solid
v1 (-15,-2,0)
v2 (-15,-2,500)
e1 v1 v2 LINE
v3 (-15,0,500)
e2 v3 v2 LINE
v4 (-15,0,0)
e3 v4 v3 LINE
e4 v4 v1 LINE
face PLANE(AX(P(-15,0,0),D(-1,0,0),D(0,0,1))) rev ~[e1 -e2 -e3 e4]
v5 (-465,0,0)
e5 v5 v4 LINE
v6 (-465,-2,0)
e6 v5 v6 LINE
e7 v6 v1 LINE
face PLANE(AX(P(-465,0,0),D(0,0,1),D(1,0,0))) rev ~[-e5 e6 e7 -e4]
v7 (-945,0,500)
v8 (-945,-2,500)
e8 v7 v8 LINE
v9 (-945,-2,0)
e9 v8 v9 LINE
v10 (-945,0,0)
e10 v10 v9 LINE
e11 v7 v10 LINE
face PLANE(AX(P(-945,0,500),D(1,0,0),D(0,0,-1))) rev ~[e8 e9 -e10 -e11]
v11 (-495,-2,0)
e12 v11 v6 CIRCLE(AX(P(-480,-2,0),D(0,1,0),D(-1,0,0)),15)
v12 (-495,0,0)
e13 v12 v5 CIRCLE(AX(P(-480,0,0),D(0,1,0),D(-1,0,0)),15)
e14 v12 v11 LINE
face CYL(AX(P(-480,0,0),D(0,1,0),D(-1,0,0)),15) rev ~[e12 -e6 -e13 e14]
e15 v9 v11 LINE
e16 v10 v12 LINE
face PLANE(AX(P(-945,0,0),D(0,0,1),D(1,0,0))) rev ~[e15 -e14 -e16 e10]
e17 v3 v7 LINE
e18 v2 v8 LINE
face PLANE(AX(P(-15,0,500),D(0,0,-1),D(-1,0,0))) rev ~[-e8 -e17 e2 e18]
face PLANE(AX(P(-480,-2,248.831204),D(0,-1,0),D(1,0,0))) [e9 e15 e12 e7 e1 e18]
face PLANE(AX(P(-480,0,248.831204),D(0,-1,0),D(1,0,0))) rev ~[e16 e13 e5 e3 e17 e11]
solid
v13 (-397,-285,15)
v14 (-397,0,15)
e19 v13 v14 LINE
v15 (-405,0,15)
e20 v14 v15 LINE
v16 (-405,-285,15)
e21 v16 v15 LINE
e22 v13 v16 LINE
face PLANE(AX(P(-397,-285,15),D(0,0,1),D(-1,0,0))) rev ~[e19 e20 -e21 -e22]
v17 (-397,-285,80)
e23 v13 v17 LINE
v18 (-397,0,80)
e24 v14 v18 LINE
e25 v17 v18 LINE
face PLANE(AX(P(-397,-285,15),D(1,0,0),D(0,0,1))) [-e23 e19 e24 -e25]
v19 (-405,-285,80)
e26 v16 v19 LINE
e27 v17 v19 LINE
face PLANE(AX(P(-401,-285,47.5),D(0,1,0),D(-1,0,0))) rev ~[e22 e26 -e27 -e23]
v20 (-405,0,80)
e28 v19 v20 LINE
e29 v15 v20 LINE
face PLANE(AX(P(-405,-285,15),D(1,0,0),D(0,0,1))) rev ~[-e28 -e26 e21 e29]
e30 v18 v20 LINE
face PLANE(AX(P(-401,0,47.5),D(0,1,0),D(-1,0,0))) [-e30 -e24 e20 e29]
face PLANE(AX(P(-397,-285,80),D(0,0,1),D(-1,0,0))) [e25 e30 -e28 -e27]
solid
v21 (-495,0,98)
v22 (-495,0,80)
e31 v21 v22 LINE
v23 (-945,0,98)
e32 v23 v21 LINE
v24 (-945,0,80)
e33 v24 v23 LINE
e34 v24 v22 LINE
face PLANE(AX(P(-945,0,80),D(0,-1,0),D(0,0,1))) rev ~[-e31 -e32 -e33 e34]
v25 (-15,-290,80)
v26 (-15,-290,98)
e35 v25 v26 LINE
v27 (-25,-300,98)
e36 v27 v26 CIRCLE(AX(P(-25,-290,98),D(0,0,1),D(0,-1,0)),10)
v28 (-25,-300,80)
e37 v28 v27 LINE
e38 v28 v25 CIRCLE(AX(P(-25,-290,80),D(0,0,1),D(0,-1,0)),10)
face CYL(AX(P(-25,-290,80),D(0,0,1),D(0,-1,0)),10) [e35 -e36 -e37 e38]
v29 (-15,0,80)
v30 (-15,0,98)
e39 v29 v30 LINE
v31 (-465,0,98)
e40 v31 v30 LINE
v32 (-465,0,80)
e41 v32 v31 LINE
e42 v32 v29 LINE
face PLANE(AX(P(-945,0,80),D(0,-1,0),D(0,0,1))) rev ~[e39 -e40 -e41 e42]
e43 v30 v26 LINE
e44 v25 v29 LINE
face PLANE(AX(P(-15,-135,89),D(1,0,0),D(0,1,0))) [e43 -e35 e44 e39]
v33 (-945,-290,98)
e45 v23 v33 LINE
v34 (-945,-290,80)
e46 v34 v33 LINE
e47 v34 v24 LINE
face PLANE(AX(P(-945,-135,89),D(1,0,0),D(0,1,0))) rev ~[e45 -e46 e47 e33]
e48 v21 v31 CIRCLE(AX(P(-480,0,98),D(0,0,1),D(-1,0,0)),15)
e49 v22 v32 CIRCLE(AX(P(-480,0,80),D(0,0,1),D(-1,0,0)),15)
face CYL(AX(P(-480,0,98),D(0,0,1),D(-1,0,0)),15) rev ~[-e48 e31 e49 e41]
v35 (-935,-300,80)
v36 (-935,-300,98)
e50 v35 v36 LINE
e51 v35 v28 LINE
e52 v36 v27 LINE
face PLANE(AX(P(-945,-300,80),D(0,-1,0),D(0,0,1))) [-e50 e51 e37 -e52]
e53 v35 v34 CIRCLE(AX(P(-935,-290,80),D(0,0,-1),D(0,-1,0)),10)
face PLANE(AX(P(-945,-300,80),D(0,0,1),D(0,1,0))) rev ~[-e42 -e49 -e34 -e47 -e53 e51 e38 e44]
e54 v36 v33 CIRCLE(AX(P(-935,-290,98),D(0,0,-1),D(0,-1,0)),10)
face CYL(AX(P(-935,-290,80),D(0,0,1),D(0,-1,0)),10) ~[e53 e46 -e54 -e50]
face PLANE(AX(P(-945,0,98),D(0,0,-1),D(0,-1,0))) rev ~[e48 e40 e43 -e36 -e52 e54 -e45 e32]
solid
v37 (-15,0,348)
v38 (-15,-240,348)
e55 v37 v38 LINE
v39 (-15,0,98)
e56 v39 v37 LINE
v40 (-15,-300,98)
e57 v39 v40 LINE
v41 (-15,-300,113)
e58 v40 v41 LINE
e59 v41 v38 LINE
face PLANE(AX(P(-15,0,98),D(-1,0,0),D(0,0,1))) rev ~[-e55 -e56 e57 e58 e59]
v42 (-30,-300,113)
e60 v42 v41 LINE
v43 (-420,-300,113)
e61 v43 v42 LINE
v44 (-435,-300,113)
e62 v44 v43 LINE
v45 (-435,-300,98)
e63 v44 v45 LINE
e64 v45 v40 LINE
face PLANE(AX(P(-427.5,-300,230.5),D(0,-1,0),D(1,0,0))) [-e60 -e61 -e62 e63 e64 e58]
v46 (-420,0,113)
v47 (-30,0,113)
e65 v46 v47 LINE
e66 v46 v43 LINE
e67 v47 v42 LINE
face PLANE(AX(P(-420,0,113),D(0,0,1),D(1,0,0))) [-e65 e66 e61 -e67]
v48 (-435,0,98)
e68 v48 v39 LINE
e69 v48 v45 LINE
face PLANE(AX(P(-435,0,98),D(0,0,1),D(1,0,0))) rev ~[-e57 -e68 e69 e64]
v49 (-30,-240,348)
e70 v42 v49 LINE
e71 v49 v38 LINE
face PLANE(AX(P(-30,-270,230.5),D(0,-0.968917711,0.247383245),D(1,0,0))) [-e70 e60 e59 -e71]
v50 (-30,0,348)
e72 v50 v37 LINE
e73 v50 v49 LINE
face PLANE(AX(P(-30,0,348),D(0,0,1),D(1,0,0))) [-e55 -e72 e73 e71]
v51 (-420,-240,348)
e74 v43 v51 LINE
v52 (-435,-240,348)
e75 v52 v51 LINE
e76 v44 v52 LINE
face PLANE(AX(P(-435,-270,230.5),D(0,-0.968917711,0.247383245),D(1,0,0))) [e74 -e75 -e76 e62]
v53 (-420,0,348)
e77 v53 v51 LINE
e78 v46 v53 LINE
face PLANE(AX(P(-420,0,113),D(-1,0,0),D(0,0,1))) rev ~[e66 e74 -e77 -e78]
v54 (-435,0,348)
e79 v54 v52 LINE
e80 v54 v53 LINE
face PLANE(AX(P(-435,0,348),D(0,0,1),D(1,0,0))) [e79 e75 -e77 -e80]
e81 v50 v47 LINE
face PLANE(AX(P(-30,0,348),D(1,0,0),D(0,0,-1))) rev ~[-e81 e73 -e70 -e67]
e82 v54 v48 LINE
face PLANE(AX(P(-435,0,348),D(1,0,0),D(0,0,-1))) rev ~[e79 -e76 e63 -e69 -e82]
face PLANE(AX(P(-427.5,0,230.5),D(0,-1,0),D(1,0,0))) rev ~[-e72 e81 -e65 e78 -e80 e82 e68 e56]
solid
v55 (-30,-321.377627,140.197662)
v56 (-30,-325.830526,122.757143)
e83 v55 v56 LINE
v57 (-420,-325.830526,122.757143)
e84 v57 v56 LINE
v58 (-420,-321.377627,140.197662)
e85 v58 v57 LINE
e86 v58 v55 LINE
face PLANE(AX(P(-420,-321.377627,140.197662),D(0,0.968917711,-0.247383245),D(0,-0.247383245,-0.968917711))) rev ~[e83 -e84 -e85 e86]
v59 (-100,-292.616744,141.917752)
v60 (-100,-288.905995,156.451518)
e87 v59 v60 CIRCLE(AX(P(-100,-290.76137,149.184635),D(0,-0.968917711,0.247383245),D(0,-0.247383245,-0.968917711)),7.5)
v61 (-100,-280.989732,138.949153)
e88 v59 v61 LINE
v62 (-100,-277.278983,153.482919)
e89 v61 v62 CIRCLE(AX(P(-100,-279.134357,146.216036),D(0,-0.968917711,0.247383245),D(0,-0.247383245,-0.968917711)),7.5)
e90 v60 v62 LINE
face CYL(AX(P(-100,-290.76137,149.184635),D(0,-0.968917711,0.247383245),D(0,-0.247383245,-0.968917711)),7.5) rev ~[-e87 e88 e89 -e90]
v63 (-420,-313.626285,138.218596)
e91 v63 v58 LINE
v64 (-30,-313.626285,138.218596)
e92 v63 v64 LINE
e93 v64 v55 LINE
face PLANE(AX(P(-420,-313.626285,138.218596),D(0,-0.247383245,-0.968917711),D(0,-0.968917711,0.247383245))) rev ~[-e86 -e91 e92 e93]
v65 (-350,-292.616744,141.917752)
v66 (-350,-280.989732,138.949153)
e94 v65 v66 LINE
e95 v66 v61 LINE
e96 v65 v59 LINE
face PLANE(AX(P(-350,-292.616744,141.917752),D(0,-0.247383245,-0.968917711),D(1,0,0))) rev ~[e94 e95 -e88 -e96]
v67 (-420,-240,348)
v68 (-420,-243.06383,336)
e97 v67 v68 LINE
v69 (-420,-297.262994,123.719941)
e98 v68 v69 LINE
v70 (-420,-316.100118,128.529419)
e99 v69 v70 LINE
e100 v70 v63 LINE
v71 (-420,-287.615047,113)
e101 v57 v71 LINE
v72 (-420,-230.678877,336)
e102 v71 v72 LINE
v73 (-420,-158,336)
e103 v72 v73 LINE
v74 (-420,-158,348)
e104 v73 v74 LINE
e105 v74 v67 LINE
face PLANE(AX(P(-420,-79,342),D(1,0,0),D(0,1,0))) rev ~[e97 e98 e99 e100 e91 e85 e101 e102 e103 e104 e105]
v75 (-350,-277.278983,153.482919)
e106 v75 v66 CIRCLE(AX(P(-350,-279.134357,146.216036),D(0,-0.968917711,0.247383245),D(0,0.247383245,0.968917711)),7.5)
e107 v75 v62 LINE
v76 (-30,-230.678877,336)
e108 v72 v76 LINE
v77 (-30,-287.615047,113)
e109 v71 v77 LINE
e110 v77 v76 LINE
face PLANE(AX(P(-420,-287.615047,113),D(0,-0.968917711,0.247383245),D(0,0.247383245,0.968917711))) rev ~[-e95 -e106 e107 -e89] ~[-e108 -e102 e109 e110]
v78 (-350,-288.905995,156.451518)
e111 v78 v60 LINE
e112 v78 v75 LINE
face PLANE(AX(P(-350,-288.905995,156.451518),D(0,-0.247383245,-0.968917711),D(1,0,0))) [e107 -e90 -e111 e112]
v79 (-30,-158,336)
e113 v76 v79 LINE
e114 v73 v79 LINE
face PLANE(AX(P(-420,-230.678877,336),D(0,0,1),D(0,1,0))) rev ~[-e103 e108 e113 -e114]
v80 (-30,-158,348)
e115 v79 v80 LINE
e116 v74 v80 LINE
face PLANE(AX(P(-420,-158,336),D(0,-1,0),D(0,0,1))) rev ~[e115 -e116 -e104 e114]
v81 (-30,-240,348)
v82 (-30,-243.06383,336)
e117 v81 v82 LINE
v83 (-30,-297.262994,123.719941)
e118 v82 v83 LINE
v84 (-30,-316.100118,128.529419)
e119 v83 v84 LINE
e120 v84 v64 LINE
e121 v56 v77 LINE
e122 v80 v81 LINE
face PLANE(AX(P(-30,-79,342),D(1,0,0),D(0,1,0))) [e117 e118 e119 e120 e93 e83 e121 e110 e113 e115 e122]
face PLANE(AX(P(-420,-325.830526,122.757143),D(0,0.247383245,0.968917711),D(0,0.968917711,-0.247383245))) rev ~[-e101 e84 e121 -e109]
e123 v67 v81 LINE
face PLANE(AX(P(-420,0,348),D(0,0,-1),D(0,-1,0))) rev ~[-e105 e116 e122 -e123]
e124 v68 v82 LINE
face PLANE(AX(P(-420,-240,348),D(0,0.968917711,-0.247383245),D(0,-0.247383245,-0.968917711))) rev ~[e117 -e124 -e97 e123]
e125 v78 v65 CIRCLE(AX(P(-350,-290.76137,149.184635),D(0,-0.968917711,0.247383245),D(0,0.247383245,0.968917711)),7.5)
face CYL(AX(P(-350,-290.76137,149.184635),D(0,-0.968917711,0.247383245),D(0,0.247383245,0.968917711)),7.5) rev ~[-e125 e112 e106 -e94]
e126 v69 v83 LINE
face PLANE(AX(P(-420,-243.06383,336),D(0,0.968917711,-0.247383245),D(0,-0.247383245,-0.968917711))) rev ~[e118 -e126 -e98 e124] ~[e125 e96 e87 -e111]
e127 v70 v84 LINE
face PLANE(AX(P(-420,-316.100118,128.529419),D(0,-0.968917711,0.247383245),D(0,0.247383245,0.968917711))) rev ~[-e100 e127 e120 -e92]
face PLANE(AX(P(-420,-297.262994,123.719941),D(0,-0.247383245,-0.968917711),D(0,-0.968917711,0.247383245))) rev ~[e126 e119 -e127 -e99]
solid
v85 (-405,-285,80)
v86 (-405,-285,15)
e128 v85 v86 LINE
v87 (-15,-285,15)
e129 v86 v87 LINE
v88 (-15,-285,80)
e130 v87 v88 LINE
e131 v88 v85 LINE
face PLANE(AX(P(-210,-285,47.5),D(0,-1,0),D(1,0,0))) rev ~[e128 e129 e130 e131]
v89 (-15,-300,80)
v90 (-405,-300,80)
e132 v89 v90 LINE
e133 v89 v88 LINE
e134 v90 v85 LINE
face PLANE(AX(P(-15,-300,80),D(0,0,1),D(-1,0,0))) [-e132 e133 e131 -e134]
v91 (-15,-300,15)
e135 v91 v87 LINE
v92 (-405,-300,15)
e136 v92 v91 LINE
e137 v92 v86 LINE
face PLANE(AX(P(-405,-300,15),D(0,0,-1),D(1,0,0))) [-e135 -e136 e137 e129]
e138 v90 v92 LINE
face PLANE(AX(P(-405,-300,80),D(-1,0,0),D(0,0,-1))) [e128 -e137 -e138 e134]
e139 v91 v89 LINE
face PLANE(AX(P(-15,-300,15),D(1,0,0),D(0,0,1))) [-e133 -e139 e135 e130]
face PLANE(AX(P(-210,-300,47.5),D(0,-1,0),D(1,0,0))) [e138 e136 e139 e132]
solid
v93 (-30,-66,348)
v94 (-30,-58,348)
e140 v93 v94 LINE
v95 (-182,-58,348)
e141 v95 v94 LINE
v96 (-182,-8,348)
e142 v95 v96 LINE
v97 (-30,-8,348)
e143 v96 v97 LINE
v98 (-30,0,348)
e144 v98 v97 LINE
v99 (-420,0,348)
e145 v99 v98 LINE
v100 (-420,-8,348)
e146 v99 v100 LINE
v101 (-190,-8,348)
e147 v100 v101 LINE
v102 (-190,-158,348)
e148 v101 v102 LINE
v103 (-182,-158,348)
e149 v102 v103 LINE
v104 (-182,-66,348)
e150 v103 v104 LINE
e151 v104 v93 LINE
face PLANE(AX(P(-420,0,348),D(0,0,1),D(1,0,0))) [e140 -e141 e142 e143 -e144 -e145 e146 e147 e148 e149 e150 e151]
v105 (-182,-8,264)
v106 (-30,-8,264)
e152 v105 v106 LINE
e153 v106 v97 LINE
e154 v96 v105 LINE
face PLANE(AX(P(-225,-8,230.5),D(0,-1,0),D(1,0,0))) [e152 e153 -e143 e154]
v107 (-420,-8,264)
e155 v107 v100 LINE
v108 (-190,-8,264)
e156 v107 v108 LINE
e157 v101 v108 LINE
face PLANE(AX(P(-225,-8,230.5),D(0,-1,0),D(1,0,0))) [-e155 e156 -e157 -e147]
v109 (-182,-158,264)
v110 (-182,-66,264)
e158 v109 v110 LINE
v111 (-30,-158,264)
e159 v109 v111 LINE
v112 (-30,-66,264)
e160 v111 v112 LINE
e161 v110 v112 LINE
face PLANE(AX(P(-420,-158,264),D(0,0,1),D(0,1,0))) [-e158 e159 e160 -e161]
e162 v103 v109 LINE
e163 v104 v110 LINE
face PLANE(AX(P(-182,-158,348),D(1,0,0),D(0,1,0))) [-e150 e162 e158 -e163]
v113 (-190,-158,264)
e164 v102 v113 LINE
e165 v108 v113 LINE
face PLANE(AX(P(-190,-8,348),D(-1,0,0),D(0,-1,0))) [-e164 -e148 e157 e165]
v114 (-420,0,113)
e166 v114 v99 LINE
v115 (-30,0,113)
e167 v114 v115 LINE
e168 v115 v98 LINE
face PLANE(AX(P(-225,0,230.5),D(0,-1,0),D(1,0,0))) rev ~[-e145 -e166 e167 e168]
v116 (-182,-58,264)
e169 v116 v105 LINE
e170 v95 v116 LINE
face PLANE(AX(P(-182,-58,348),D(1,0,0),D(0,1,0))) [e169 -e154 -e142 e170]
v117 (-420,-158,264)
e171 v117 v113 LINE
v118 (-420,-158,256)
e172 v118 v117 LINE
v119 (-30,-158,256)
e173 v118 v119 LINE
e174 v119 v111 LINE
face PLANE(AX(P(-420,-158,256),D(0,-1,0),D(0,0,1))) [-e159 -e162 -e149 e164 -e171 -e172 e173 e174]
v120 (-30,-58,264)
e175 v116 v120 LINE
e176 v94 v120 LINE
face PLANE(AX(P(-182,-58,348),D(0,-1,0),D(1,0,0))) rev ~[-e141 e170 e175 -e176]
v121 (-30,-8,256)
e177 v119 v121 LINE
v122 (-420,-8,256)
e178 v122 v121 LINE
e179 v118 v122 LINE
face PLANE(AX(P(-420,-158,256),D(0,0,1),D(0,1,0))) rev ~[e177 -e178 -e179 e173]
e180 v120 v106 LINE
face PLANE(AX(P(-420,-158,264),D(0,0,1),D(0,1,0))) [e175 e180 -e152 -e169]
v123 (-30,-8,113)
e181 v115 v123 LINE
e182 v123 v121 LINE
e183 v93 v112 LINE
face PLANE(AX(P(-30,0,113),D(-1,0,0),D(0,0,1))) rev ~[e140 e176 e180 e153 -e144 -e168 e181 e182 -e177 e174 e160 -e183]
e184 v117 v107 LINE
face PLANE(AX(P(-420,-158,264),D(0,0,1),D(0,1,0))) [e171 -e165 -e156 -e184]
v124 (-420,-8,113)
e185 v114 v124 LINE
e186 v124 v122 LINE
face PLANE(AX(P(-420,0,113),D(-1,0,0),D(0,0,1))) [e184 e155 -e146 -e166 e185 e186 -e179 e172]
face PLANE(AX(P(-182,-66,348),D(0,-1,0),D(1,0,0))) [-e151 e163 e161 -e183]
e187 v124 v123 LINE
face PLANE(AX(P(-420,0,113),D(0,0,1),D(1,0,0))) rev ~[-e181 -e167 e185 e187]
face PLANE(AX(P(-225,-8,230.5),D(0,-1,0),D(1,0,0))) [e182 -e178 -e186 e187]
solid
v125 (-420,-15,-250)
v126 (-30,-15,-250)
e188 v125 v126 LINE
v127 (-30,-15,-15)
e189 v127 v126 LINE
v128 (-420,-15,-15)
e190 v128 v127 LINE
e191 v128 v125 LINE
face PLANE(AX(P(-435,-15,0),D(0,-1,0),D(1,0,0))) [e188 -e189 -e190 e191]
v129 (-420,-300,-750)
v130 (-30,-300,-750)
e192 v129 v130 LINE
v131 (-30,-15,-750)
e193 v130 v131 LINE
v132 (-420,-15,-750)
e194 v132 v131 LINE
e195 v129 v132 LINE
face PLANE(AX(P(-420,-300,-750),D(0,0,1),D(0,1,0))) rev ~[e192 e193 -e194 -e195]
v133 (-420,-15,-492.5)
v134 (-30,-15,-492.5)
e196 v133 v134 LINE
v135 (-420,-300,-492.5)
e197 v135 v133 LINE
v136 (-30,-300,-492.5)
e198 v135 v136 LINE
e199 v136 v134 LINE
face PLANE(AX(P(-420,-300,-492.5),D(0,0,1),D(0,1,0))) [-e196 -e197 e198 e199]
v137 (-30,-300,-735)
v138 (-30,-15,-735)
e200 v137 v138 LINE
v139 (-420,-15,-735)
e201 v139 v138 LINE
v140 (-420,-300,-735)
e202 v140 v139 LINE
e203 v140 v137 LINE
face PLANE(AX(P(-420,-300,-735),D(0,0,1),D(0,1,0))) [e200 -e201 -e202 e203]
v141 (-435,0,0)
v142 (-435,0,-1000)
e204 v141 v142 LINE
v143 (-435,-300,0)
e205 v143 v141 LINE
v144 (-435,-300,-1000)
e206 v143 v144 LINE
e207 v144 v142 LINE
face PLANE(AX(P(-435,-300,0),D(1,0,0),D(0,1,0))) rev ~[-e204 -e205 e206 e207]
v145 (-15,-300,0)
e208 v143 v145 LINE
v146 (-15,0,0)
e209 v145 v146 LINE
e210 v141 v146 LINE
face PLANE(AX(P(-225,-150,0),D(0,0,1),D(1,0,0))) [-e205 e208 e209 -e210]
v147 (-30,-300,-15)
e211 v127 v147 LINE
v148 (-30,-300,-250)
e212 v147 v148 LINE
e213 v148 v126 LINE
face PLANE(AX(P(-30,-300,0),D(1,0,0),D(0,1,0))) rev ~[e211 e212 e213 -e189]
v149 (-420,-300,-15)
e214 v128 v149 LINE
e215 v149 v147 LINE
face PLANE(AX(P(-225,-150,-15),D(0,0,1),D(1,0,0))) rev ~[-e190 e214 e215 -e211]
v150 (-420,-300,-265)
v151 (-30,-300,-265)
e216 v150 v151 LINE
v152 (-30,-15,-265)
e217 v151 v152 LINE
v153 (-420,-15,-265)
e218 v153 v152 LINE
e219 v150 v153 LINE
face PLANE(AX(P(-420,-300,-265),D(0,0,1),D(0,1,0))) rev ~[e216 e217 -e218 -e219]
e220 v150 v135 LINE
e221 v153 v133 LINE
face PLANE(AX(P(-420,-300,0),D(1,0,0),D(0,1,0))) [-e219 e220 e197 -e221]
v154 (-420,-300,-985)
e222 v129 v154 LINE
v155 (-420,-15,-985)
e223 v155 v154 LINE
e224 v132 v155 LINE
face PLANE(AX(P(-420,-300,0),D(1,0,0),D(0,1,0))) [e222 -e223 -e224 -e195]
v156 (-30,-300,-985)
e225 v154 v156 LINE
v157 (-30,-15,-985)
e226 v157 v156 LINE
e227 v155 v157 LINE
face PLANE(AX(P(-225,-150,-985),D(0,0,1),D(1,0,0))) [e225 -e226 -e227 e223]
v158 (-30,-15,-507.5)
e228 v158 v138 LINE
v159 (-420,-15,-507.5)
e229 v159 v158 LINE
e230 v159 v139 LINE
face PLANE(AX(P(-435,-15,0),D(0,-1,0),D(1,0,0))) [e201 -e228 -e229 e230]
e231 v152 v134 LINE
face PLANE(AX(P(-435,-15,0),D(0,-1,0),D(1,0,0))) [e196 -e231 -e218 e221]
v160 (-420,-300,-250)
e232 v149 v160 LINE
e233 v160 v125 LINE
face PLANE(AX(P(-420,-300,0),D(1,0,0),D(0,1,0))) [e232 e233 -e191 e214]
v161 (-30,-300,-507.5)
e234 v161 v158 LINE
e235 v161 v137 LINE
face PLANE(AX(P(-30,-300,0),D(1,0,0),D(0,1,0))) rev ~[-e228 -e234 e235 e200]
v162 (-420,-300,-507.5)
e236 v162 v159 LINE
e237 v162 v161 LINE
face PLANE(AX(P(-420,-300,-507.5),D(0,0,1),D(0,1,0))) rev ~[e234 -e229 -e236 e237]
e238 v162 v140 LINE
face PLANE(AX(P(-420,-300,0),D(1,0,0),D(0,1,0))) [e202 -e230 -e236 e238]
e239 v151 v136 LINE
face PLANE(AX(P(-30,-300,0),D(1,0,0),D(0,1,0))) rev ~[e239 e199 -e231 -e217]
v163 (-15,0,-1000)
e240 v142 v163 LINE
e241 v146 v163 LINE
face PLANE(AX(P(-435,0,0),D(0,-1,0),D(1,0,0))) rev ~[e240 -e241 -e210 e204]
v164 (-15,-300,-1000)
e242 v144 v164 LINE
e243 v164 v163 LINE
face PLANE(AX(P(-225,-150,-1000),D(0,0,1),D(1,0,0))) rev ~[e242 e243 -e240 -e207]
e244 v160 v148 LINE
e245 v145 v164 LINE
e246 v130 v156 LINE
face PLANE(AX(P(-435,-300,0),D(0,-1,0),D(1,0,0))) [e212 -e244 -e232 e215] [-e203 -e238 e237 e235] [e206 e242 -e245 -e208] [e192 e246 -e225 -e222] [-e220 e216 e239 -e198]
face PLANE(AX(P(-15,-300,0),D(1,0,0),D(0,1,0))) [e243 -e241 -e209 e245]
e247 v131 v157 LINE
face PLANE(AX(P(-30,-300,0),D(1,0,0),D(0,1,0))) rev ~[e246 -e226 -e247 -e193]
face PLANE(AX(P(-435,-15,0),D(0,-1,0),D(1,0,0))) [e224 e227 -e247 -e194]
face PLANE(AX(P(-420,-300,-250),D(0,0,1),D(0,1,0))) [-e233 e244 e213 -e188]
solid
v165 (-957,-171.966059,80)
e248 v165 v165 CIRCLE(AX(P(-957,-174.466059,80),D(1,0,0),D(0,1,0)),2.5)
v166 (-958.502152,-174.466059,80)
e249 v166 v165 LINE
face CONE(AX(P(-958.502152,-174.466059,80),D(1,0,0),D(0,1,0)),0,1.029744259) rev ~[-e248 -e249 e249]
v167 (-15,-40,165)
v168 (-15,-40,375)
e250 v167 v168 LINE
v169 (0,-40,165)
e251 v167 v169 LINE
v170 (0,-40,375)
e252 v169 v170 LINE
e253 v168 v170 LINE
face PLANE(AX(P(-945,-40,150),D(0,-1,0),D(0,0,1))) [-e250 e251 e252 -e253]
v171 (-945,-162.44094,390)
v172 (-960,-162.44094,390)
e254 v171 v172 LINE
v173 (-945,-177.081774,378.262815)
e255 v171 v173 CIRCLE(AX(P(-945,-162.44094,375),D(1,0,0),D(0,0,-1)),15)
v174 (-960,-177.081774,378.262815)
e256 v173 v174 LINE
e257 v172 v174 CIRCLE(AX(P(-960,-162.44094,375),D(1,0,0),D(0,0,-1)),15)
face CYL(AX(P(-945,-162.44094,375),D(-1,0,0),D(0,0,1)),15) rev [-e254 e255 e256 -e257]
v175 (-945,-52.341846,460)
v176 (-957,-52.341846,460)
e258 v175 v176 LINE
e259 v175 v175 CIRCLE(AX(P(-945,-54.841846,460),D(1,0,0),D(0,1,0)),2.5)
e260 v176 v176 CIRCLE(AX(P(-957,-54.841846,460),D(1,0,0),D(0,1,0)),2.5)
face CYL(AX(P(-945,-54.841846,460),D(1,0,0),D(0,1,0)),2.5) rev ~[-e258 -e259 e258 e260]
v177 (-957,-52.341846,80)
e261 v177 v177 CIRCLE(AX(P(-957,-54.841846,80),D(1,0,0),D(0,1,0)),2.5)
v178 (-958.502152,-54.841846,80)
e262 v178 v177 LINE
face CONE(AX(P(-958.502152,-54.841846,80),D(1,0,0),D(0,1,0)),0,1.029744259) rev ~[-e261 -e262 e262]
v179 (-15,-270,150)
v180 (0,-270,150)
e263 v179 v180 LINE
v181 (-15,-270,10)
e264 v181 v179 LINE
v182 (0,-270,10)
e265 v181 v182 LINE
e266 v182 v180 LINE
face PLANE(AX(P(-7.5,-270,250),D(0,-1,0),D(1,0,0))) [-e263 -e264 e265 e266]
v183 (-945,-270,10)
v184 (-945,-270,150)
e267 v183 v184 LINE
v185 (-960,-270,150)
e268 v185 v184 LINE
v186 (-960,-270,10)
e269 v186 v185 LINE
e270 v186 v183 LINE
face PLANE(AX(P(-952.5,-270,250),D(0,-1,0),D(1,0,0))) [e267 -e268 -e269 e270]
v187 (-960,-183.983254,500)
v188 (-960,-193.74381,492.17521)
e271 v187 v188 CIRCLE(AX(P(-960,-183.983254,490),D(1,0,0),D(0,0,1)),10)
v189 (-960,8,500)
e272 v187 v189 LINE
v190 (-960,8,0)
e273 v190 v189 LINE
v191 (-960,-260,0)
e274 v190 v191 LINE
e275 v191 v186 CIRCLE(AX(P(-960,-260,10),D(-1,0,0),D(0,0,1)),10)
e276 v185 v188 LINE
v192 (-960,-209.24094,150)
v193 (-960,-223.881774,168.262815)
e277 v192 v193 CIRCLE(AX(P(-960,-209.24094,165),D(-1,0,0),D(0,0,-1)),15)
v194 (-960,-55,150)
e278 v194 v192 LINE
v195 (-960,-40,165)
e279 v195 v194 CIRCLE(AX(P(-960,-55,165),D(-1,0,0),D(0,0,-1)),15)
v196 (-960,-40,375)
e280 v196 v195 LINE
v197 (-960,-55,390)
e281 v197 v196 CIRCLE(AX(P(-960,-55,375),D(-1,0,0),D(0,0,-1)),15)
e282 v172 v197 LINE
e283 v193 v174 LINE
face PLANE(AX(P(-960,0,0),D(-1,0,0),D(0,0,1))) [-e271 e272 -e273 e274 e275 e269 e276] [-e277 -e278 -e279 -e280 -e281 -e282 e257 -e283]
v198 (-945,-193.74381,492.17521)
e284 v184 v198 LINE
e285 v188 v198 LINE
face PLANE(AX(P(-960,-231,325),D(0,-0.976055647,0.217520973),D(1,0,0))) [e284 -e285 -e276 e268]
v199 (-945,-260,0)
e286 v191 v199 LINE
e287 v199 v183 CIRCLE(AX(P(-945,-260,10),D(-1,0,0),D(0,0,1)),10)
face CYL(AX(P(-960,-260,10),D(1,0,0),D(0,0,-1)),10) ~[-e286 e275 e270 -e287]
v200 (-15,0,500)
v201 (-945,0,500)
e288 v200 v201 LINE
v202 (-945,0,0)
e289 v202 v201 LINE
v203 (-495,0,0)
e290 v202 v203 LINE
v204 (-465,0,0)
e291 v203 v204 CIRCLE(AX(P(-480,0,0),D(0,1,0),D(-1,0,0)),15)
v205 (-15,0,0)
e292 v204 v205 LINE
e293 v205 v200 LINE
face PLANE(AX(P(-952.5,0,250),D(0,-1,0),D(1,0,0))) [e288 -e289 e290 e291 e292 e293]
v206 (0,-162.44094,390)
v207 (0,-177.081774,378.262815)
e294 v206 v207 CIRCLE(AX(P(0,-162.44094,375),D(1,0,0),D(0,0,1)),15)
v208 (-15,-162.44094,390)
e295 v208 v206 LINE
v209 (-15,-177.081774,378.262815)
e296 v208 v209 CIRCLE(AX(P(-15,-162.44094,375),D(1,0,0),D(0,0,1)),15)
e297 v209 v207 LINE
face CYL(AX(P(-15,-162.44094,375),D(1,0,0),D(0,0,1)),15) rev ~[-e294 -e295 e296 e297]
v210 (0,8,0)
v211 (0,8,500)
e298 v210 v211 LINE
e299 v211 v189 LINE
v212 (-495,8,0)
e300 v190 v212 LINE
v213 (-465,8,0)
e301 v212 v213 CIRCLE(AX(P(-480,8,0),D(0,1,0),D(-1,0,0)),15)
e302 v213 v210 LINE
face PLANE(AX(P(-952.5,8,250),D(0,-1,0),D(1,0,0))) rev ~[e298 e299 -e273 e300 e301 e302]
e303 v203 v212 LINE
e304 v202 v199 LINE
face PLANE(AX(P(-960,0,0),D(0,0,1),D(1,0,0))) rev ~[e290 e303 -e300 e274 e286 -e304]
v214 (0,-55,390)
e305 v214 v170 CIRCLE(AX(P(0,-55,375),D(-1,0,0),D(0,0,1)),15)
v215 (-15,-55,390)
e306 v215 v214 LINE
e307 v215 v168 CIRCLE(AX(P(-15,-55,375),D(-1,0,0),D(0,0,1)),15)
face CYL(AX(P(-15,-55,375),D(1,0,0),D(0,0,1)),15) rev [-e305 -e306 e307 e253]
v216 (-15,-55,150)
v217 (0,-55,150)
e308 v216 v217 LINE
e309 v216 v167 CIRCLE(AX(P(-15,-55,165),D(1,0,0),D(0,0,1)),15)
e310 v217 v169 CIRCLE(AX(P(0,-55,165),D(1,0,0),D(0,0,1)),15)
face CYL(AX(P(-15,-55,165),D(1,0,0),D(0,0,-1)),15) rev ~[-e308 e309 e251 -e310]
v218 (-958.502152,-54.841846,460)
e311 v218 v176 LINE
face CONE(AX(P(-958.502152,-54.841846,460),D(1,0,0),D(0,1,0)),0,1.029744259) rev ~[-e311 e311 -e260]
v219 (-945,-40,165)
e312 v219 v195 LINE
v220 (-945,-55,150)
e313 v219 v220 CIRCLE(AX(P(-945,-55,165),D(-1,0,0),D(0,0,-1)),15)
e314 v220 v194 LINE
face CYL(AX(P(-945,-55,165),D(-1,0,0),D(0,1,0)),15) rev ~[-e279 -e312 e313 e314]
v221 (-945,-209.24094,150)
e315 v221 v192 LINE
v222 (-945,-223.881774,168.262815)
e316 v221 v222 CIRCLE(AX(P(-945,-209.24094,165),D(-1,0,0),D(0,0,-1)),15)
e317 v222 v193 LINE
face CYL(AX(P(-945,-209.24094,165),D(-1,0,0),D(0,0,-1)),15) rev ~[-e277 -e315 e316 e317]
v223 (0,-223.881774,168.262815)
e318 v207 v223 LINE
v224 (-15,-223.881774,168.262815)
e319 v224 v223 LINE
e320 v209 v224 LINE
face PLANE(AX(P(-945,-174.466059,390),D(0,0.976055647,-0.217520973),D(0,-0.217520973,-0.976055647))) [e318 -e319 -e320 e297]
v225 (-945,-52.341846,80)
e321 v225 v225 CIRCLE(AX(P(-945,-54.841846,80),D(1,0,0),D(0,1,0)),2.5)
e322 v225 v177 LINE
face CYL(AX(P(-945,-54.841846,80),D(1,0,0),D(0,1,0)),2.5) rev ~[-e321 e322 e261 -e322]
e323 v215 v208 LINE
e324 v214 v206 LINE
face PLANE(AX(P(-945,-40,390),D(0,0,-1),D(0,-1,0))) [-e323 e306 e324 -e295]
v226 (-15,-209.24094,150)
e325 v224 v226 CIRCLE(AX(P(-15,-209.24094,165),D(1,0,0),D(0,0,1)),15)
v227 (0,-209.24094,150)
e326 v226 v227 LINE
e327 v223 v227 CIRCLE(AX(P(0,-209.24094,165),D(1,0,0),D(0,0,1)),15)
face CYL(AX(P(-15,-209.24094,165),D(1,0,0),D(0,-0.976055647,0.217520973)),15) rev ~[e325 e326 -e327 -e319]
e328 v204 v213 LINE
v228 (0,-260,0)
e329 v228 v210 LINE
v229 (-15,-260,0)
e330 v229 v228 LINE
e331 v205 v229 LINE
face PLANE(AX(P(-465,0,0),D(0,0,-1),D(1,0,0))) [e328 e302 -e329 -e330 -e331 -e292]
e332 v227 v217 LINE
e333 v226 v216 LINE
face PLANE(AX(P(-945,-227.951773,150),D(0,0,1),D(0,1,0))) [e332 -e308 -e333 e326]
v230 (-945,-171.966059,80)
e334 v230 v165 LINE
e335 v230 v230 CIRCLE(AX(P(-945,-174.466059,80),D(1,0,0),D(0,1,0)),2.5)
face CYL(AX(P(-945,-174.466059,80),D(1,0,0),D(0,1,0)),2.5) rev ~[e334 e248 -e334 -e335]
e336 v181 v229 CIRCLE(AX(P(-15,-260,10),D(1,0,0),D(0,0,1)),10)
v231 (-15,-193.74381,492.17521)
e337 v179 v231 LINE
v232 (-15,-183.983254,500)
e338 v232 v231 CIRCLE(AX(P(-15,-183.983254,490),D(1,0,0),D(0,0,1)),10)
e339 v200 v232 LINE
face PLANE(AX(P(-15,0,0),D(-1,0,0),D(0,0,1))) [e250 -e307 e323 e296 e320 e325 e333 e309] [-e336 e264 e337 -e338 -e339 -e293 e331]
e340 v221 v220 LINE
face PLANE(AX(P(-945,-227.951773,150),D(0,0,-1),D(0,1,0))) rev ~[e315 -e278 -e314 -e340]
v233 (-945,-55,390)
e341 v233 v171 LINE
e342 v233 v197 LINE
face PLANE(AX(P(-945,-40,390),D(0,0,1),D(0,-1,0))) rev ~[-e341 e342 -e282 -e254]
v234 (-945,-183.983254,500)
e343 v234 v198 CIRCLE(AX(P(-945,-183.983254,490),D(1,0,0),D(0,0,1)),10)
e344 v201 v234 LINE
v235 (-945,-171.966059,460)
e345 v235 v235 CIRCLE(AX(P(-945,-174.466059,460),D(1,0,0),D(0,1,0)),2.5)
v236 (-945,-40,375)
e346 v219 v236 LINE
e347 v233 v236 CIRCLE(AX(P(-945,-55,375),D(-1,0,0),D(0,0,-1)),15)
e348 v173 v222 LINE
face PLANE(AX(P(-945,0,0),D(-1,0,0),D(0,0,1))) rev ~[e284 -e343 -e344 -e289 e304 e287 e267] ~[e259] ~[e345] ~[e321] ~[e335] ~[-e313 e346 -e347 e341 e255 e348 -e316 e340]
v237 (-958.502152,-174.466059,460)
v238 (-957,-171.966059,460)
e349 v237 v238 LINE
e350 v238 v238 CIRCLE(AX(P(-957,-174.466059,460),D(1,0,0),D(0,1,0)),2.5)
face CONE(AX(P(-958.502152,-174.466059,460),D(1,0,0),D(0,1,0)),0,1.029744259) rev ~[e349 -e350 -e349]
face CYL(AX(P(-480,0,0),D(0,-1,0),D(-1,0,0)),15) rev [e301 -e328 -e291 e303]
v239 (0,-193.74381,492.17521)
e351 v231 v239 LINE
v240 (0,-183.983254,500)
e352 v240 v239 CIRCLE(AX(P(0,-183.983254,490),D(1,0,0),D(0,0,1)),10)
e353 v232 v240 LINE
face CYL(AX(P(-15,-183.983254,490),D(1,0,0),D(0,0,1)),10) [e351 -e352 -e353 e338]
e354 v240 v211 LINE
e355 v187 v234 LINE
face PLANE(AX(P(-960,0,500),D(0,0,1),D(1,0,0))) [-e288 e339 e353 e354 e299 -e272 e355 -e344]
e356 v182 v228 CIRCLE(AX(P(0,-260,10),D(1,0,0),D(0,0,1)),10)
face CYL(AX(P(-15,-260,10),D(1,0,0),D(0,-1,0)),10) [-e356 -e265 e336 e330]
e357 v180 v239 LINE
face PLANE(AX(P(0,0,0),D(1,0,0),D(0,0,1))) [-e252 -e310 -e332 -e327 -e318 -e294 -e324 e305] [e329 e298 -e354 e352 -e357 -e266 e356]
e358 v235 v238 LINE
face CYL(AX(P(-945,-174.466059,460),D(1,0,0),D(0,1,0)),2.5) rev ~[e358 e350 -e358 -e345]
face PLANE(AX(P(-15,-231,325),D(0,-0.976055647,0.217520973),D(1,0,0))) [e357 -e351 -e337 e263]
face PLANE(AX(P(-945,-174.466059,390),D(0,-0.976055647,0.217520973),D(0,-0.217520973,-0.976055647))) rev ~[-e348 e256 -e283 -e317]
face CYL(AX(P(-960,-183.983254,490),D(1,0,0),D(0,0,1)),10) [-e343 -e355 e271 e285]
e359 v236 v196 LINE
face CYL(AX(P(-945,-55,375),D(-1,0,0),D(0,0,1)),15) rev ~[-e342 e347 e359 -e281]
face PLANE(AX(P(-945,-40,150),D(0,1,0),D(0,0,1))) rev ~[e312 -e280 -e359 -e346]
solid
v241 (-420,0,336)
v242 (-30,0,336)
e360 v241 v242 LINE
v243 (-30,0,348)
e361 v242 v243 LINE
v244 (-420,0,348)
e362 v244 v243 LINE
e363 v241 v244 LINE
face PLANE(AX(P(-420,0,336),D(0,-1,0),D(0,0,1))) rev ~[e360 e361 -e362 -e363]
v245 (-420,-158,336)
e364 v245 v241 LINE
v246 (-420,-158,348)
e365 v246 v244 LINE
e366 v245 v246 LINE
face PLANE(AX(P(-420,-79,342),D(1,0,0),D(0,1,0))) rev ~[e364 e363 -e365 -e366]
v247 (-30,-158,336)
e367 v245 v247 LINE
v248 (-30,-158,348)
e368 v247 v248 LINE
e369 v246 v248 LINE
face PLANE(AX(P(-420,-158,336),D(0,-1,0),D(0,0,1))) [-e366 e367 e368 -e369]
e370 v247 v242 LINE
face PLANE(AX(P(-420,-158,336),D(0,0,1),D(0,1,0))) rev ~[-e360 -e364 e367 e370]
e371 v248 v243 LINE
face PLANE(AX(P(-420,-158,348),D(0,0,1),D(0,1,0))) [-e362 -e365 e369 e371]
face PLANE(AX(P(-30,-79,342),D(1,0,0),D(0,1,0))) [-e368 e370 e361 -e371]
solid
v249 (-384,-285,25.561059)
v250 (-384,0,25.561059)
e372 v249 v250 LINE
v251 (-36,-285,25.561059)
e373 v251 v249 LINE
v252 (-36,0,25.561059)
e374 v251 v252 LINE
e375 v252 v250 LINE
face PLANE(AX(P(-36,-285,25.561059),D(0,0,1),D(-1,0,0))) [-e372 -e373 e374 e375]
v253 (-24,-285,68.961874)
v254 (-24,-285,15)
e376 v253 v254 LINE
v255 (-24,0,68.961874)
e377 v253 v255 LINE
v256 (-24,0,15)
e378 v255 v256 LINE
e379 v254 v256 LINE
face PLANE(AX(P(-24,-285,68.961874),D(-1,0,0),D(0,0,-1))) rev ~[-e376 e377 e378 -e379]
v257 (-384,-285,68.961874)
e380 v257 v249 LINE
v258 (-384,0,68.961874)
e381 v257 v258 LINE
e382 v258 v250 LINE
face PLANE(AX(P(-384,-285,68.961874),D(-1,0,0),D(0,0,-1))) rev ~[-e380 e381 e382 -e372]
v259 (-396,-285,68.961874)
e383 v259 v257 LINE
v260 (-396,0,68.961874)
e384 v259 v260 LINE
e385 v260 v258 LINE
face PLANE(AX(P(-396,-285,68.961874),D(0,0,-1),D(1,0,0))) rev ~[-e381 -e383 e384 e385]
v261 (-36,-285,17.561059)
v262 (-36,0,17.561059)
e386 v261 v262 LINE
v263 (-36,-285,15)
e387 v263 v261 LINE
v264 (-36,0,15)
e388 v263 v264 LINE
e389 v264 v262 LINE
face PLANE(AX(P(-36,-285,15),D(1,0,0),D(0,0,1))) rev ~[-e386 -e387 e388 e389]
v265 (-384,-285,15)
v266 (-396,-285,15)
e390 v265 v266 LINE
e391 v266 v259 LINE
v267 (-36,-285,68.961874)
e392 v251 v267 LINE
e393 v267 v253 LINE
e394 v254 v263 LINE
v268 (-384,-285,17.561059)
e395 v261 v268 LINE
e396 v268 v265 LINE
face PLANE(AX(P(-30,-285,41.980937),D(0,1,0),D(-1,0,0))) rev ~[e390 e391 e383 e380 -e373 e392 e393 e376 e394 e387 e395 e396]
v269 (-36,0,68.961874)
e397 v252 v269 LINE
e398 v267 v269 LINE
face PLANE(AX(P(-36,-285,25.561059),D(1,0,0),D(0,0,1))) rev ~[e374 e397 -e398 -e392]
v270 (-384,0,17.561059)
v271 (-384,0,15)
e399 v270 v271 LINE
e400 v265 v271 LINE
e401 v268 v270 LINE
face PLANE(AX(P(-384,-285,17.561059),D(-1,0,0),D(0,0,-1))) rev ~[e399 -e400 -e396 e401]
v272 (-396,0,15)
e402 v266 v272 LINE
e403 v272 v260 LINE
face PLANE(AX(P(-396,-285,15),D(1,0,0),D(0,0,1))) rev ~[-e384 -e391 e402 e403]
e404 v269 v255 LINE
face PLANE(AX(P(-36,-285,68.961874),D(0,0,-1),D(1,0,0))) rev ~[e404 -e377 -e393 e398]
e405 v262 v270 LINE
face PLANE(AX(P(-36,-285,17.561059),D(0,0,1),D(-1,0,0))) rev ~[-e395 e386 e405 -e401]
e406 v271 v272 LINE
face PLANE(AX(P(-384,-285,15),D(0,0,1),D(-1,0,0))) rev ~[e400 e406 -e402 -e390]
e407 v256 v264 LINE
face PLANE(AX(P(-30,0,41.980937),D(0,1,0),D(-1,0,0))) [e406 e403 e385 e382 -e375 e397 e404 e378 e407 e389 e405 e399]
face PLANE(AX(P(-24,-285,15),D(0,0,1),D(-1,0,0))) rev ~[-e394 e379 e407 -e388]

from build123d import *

# Parameters (mm, degrees)
F0_W           = 15
F0_H           = 500
F1_DEPTH       = 8
F2_DEPTH       = 270
F3_SIZE2       = 78
F3_SIZE        = 350
F3_2_SIZE2     = 78
F3_2_SIZE      = 350
F4_W           = 270
F4_H           = 18
F4_W_2         = 30
F5_DEPTH       = 930
F6_R           = 10
F6_2_R         = 10
F7_W           = 15
F7_H           = 235
F7_H_2         = 15
F7_W_2         = 390
F8_DEPTH       = 300
F9_DEPTH       = 8
F10_SIZE2      = 60
F10_SIZE       = 235
F11_W          = 158
F11_H          = 12
F12_DEPTH      = 390
F13_W          = 250
F13_H          = 15
F14_DEPTH      = 25
F15_DEPTH      = 390
F18_DEPTH      = 15
F19_W          = 348
F19_H          = 8
F20_DEPTH      = 285
F19_W_2        = 8
F19_H_2        = 65
F21_DEPTH      = 285
F22_D          = 5
F22_DEPTH      = 12
F22_TIP        = 1.5021515476
F23_DEPTH      = 25
F23_DEPTH_BACK = 945
F24_R          = 15
F26_DEPTH      = 25
F11_W_2        = 150
F11_H_2        = 8
F28_DEPTH      = 390
F27_W          = 152
F27_H          = 8
F29_DEPTH      = 84
F31_DEPTH      = 2
F32_W          = 420
F32_H          = 300
F33_DEPTH      = 1000
F34_T          = -15
F35_W          = 285
F35_H          = 15
F36_DEPTH      = 390


# Not quite as in the source:
# - a feature names something its author has since deleted; it is built from what else it names


with BuildPart() as f1:
    # F0 (on Front) → F1 (new body)
    with BuildSketch(Plane.XZ):
        with Locations((-952.5, 250)):
            Rectangle(F0_W, F0_H)
        with BuildLine():
            Line((-465, 0), (-15, 0))
            Line((-15, 0), (-15, 500))
            Line((-15, 500), (-945, 500))
            Line((-945, 500), (-945, 0))
            Line((-945, 0), (-495, 0))
            ThreePointArc((-495, 0), (-480, 15), (-465, 0))
        make_face()
        with Locations((-7.5, 250)):
            Rectangle(F0_W, F0_H)
    extrude(amount=-F1_DEPTH)

    # F0 (on Front) → F2 (join)
    with BuildSketch(Plane.XZ):
        with Locations((-952.5, 250)):
            Rectangle(F0_W, F0_H)
        with Locations((-7.5, 250)):
            Rectangle(F0_W, F0_H)
    extrude(amount=F2_DEPTH)

    # F3
    f3_edges = [f1.edges().sort_by_distance(p)[0] for p in [
        (-952.5, -270, 500),
    ]]
    f3_side = f1.faces().sort_by_distance((-952.5, -270, 250))[0]
    chamfer(f3_edges, length=F3_SIZE, length2=F3_SIZE2, reference=f3_side)

    # F3#2
    f3_2_edges = [f1.edges().sort_by_distance(p)[0] for p in [
        (-7.5, -270, 500),
    ]]
    f3_2_side = f1.faces().sort_by_distance((-7.5, -270, 250))[0]
    chamfer(f3_2_edges, length=F3_2_SIZE, length2=F3_2_SIZE2, reference=f3_2_side)

    # F6
    f6_edges = [f1.edges().sort_by_distance(p)[0] for p in [
        (-952.5, -192, 500),
        (-7.5, -192, 500),
        (-7.5, -270, 0),
        (-952.5, -270, 0),
    ]]
    fillet(f6_edges, radius=F6_R)

    # F22 (one way)
    with BuildSketch(Plane.YZ.offset(-945)):
        with Locations((-174.4660586119, 460), (-54.8418462276, 460), (-174.4660586119, 80), (-54.8418462276, 80)):
            Circle(F22_D / 2)
    extrude(amount=-F22_DEPTH, mode=Mode.SUBTRACT)
    with Locations(Plane.YZ.offset(-945)):
        with Locations((-174.4660586119, 460), (-54.8418462276, 460), (-174.4660586119, 80), (-54.8418462276, 80)):
            with Locations((0, 0, -(F22_DEPTH + F22_TIP / 2))):  # 118° drill point
                Cone(0, F22_D / 2, F22_TIP, mode=Mode.SUBTRACT)

    # F4 (on face) → F23 (cut, two sides)
    with BuildSketch(Plane.YZ.offset(-945)) as f23_sk:
        Polygon((-40, 390), (-174.4660586119, 390), (-227.9517728976, 150), (-40, 150), align=None)
    extrude(amount=-F23_DEPTH, mode=Mode.SUBTRACT)
    extrude(f23_sk.sketch, amount=F23_DEPTH_BACK, mode=Mode.SUBTRACT)

    # F24
    f24_edges = [f1.edges().sort_by_distance(p)[0] for p in [
        (-952.5, -40, 150),
        (-952.5, -227.951773, 150),
        (-952.5, -40, 390),
        (-7.5, -227.951773, 150),
        (-7.5, -40, 150),
        (-7.5, -40, 390),
        (-7.5, -174.466059, 390),
        (-952.5, -174.466059, 390),
    ]]
    fillet(f24_edges, radius=F24_R)


with BuildPart() as f5:
    # F4 (on face) → F5 (new body, through all)
    with BuildSketch(Plane.YZ.offset(-945)):
        with Locations((-135, 89)):
            Rectangle(F4_W, F4_H)
        with Locations((-285, 89)):
            Rectangle(F4_W_2, F4_H)
    extrude(amount=F5_DEPTH)

    # F6#2
    f6_2_edges = [f5.edges().sort_by_distance(p)[0] for p in [
        (-945, -300, 89),
        (-15, -300, 89),
    ]]
    fillet(f6_2_edges, radius=F6_2_R)

    # F25 (on face) → F26 (cut)
    with BuildSketch(Plane.XY.offset(98)):
        with BuildLine():
            Line((-495, 0), (-465, 0))
            ThreePointArc((-465, 0), (-480, 15), (-495, 0))
        make_face()
        with BuildLine():
            ThreePointArc((-495, 0), (-480, -15), (-465, 0))
            Line((-465, 0), (-495, 0))
        make_face()
    extrude(amount=-F26_DEPTH, mode=Mode.SUBTRACT)


with BuildPart() as f8:
    # F7 (on Front) → F8 (new body)
    with BuildSketch(Plane.XZ):
        with Locations((-427.5, 230.5)):
            Rectangle(F7_W, F7_H)
        with Locations((-427.5, 105.5)):
            Rectangle(F7_W, F7_H_2)
        with Locations((-22.5, 230.5)):
            Rectangle(F7_W, F7_H)
        with Locations((-22.5, 105.5)):
            Rectangle(F7_W, F7_H_2)
        with Locations((-225, 105.5)):
            Rectangle(F7_W_2, F7_H_2)
    extrude(amount=F8_DEPTH)

    # F10
    f10_edges = [f8.edges().sort_by_distance(p)[0] for p in [
        (-427.5, -300, 348),
        (-22.5, -300, 348),
    ]]
    f10_side = f8.faces().sort_by_distance((-427.5, -300, 343.11226))[0]
    chamfer(f10_edges, length=F10_SIZE, length2=F10_SIZE2, reference=f10_side)


with BuildPart() as f9:
    # F7 (on Front) → F9 (new body)
    with BuildSketch(Plane.XZ):
        with Locations((-225, 230.5)):
            Rectangle(F7_W_2, F7_H)
    extrude(amount=F9_DEPTH)

    # F11 (on face) → F28 (join, through all)
    with BuildSketch(Plane.YZ.offset(-420)):
        with Locations((-83, 260)):
            Rectangle(F11_W_2, F11_H_2)
    extrude(amount=F28_DEPTH)

    # F27 (on face) → F29 (join, through all)
    with BuildSketch(Plane.XY.offset(348)):
        Polygon((-182, -8), (-190, -8), (-190, -158), (-182, -158), (-182, -66), (-182, -58), align=None)
        with Locations((-106, -62)):
            Rectangle(F27_W, F27_H)
    extrude(amount=-F29_DEPTH)


with BuildPart() as f12:
    # F11 (on face) → F12 (new body, through all)
    with BuildSketch(Plane.YZ.offset(-420)):
        with Locations((-79, 342)):
            Rectangle(F11_W, F11_H)
        Polygon((-227.6150473168, 348), (-240, 348), (-243.0638297872, 336), (-230.678877104, 336), align=None)
        Polygon((-230.678877104, 336), (-243.0638297872, 336), (-297.2629938822, 123.7199406282), (-299.2420598443, 115.9685989432), (-287.6150473168, 113), align=None)
        Polygon((-299.2420598443, 115.9685989432), (-297.2629938822, 123.7199406282), (-316.1001179345, 128.5294191096), (-313.6262854818, 138.2185962159), (-321.3776271668, 140.197662178), (-325.8305255816, 122.7571433868), align=None)
        Polygon((-158, 348), (-227.6150473168, 348), (-230.678877104, 336), (-158, 336), align=None)
    extrude(amount=F12_DEPTH)

    # F13 (on face) → F14 (cut)
    with BuildSketch(Plane(origin=(0, -308.725881853, 78.8236294093), x_dir=(1, 0, 0), z_dir=(0, -0.9689177106, 0.2473832453))):
        with Locations((-225, 72.618143931)):
            Rectangle(F13_W, F13_H)
        with BuildLine():
            Line((-350, 65.118143931), (-350, 80.118143931))
            ThreePointArc((-350, 80.118143931), (-357.5, 72.618143931), (-350, 65.118143931))
        make_face()
        with BuildLine():
            ThreePointArc((-100, 65.118143931), (-92.5, 72.618143931), (-100, 80.118143931))
            Line((-100, 80.118143931), (-100, 65.118143931))
        make_face()
    extrude(amount=-F14_DEPTH, mode=Mode.SUBTRACT)


with BuildPart() as f15:
    # F11 (on face) → F15 (new body, through all)
    with BuildSketch(Plane.YZ.offset(-420)):
        with Locations((-79, 342)):
            Rectangle(F11_W, F11_H)
    extrude(amount=F15_DEPTH)


with BuildPart() as f12_1:
    add(f12.part)

    # F16: cut F15
    add(f15.part, mode=Mode.SUBTRACT)


with BuildPart() as f18:
    # F17 (on face) → F18 (new body)
    with BuildSketch(Plane.XZ.offset(300)):
        Polygon((-15, 15), (-15, 80), (-25, 80), (-405, 80), (-405, 15), align=None)
    extrude(amount=-F18_DEPTH)


with BuildPart() as f20:
    # F19 (on face) → F20 (new body, through all)
    with BuildSketch(Plane(origin=(0, -285, 0), x_dir=(-1, 0, 0), z_dir=(0, 1, 0))):
        Polygon((24, 68.9618736506), (24, 15), (36, 15), (36, 17.5610594451), (36, 25.5610594451), (36, 68.9618736506), align=None)
        with Locations((210, 21.5610594451)):
            Rectangle(F19_W, F19_H)
        Polygon((384, 17.5610594451), (384, 15), (396, 15), (396, 68.9618736506), (384, 68.9618736506), (384, 25.5610594451), align=None)
    extrude(amount=F20_DEPTH)


with BuildPart() as f21:
    # F19 (on face) → F21 (new body, through all)
    with BuildSketch(Plane(origin=(0, -285, 0), x_dir=(-1, 0, 0), z_dir=(0, 1, 0))):
        with Locations((401, 47.5)):
            Rectangle(F19_W_2, F19_H_2)
    extrude(amount=F21_DEPTH)


with BuildPart() as f31:
    # F30 (on face) → F31 (new body)
    with BuildSketch(Plane.XZ):
        with BuildLine():
            Line((-15, 500), (-945, 500))
            Line((-945, 500), (-945, 0))
            Line((-945, 0), (-495, 0))
            ThreePointArc((-495, 0), (-480, 15), (-465, 0))
            Line((-465, 0), (-15, 0))
            Line((-15, 0), (-15, 500))
        make_face()
    extrude(amount=F31_DEPTH)


with BuildPart() as f33:
    # F32 (on Top) → F33 (new body)
    with BuildSketch(Plane.XY):
        with Locations((-225, -150)):
            Rectangle(F32_W, F32_H)
    extrude(amount=-F33_DEPTH)

    # F34
    f34_openings = [f33.faces().sort_by_distance(p)[0] for p in [
        (-225, -300, -500),
    ]]
    offset(amount=F34_T, openings=f34_openings)

    # F35 (on face) → F36 (join, through all)
    with BuildSketch(Plane.YZ.offset(-420)):
        with Locations((-157.5, -257.5)):
            Rectangle(F35_W, F35_H)
        with Locations((-157.5, -500)):
            Rectangle(F35_W, F35_H)
        with Locations((-157.5, -742.5)):
            Rectangle(F35_W, F35_H)
    extrude(amount=F36_DEPTH)


solid = Compound([f1.part, f5.part, f8.part, f9.part, f15.part, f12_1.part, f18.part, f20.part, f21.part, f31.part, f33.part])
